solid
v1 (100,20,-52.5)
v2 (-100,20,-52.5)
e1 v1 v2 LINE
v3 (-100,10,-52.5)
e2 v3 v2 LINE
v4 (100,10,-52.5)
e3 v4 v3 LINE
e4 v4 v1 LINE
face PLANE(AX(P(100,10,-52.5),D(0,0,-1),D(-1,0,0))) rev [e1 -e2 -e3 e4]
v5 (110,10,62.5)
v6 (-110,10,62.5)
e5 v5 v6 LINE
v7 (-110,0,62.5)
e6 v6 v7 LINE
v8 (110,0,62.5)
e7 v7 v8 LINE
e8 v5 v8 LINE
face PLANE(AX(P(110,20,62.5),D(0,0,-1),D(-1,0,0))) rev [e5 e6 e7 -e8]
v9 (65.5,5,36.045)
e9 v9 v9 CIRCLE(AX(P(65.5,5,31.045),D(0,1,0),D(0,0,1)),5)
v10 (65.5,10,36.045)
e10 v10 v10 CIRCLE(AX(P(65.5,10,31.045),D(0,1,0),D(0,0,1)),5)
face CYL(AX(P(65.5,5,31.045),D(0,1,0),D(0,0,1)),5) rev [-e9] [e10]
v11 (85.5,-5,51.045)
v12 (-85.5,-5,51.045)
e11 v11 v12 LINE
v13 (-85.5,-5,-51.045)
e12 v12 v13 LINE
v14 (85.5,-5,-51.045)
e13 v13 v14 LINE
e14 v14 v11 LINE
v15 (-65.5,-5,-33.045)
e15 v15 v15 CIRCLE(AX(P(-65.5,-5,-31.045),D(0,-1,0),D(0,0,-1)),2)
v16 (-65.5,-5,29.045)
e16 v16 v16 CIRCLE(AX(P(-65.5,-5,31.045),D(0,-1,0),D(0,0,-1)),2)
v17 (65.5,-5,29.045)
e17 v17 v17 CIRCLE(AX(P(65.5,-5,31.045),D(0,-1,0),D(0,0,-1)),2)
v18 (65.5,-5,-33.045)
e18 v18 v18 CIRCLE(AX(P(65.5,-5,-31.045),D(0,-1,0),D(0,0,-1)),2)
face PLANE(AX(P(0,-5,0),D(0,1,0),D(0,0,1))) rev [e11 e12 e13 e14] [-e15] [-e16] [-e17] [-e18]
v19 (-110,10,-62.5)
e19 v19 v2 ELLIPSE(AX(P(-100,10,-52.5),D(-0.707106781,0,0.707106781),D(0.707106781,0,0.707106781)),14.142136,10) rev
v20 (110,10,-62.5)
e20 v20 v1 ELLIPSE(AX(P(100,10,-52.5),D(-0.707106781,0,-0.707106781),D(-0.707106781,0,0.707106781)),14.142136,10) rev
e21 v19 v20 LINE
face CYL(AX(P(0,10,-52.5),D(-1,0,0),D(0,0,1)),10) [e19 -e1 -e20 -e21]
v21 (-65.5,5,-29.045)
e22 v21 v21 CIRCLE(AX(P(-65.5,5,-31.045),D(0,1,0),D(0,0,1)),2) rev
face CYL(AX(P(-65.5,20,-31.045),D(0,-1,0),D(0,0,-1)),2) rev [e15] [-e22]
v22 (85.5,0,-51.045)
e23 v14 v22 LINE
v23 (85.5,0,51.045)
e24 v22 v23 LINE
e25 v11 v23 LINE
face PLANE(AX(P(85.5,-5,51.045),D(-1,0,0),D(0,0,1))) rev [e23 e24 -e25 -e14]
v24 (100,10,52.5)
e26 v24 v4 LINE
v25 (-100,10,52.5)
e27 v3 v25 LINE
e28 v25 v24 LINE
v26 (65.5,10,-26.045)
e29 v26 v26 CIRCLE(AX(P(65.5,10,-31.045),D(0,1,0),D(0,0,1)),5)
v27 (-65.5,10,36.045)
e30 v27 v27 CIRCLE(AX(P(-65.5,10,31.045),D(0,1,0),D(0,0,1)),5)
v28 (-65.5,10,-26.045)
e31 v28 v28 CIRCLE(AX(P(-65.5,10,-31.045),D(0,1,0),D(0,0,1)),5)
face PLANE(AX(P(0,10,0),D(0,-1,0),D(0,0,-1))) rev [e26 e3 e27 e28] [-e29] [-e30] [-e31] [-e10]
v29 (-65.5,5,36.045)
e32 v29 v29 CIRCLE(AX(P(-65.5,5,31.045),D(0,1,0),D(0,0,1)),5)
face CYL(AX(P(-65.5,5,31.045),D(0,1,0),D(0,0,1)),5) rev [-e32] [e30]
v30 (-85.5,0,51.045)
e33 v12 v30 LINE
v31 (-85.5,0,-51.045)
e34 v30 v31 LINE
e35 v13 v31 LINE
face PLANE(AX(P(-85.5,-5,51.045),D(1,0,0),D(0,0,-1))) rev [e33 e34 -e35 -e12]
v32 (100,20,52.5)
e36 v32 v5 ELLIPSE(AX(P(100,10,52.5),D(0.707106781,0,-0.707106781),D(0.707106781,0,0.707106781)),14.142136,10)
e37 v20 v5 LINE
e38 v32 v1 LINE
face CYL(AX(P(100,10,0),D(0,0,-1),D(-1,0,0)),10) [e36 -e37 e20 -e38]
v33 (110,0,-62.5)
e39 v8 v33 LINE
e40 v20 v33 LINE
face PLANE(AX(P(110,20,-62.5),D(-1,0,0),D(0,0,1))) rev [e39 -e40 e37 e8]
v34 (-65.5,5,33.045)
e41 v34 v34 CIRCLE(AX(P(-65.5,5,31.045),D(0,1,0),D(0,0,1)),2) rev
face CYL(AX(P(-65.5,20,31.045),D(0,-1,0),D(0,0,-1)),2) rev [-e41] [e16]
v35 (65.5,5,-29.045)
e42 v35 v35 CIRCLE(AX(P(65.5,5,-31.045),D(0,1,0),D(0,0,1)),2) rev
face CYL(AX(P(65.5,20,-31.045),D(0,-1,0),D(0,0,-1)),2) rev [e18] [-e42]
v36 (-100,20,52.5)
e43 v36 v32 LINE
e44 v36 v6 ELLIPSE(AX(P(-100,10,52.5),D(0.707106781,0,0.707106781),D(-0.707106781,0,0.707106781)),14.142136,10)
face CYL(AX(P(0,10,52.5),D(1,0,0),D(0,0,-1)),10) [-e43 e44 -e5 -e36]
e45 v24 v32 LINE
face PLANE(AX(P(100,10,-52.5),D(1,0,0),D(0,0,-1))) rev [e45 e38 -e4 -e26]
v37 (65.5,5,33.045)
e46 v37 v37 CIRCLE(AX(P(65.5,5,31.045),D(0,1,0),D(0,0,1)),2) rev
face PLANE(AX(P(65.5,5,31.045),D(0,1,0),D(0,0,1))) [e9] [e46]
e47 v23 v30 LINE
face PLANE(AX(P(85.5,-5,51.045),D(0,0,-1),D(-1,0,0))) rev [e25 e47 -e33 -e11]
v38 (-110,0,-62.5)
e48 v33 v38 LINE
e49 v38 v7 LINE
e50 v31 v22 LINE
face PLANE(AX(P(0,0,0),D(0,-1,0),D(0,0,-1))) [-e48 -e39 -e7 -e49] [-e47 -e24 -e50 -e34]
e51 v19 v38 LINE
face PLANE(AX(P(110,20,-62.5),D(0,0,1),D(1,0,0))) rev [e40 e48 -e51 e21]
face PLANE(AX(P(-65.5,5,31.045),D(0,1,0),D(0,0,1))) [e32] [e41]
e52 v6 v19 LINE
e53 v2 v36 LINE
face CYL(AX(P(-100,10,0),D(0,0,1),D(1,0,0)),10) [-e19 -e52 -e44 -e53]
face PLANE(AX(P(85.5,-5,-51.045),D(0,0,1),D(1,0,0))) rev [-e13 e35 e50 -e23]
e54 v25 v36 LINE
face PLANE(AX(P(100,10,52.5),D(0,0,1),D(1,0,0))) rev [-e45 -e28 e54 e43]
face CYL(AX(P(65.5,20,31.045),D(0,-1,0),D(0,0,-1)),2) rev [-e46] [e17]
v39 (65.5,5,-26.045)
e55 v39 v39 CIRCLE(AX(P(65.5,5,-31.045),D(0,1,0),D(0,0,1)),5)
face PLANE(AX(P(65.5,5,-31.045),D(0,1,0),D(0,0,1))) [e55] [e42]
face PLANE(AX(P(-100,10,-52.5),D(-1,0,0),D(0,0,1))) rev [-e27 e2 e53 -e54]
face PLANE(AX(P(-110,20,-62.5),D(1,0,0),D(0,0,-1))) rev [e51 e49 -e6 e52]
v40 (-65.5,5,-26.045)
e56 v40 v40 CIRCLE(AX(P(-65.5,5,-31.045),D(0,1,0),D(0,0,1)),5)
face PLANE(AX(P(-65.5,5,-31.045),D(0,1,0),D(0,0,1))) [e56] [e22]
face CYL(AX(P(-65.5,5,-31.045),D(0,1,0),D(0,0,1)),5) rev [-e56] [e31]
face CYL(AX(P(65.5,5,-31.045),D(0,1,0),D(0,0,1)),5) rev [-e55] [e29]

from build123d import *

# Parameters (mm, degrees)
SKETCH1_W           = 220
SKETCH1_H           = 125
BOSS_EXTRUDE1_DEPTH = 20
SKETCH2_W           = 200
SKETCH2_H           = 105
CUT_EXTRUDE1_DEPTH  = 10
FILLET1_R           = 10
SKETCH3_W           = 171
SKETCH3_H           = 102.09
BOSS_EXTRUDE2_DEPTH = 5
SKETCH4_R           = 2
CUT_EXTRUDE2_DEPTH  = 129.962203765
SKETCH5_R           = 5
CUT_EXTRUDE3_DEPTH  = 5


with BuildPart() as part:
    # Sketch1 → Boss-Extrude1 (new body)
    with BuildSketch(Plane(origin=(0, 0, 0), x_dir=(1, 0, 0), z_dir=(0, 1, 0))):
        Rectangle(SKETCH1_W, SKETCH1_H)
    extrude(amount=BOSS_EXTRUDE1_DEPTH)

    # Sketch2 → Cut-Extrude1 (cut)
    with BuildSketch(Plane(origin=(0, 20, 0), x_dir=(1, 0, 0), z_dir=(0, 1, 0))):
        Rectangle(SKETCH2_W, SKETCH2_H)
    extrude(amount=-CUT_EXTRUDE1_DEPTH, mode=Mode.SUBTRACT)

    # Fillet1
    fillet1_edges = [part.edges().sort_by_distance(p)[0] for p in [
        (110, 20, 0),
        (0, 20, -62.5),
        (-110, 20, 0),
        (0, 20, 62.5),
    ]]
    fillet(fillet1_edges, radius=FILLET1_R - 0.0001)  # a hair under: the kernel refuses the full size

    # Sketch3 → Boss-Extrude2 (add)
    with BuildSketch(Plane.XZ):
        Rectangle(SKETCH3_W, SKETCH3_H)
    extrude(amount=BOSS_EXTRUDE2_DEPTH)

    # Sketch4 → Cut-Extrude2 (cut, through all)
    with BuildSketch(Plane.XZ.offset(5)):
        with Locations(Location((-65.5, 31.045, 0), (0, 0, 270))):
            Circle(SKETCH4_R)
        with Locations(Location((-65.5, -31.045, 0), (0, 0, 270))):
            Circle(SKETCH4_R)
        with Locations(Location((65.5, -31.045, 0), (0, 0, 270))):
            Circle(SKETCH4_R)
        with Locations(Location((65.5, 31.045, 0), (0, 0, 270))):
            Circle(SKETCH4_R)
    extrude(amount=-CUT_EXTRUDE2_DEPTH, mode=Mode.SUBTRACT)

    # Sketch5 → Cut-Extrude3 (cut)
    with BuildSketch(Plane(origin=(0, 10, 0), x_dir=(1, 0, 0), z_dir=(0, 1, 0))):
        with Locations(Location((-65.5, 31.045, 0), (0, 0, 270))):
            Circle(SKETCH5_R)
        with Locations(Location((-65.5, -31.045, 0), (0, 0, 270))):
            Circle(SKETCH5_R)
        with Locations(Location((65.5, -31.045, 0), (0, 0, 270))):
            Circle(SKETCH5_R)
        with Locations(Location((65.5, 31.045, 0), (0, 0, 270))):
            Circle(SKETCH5_R)
    extrude(amount=-CUT_EXTRUDE3_DEPTH, mode=Mode.SUBTRACT)


solid = part.part
